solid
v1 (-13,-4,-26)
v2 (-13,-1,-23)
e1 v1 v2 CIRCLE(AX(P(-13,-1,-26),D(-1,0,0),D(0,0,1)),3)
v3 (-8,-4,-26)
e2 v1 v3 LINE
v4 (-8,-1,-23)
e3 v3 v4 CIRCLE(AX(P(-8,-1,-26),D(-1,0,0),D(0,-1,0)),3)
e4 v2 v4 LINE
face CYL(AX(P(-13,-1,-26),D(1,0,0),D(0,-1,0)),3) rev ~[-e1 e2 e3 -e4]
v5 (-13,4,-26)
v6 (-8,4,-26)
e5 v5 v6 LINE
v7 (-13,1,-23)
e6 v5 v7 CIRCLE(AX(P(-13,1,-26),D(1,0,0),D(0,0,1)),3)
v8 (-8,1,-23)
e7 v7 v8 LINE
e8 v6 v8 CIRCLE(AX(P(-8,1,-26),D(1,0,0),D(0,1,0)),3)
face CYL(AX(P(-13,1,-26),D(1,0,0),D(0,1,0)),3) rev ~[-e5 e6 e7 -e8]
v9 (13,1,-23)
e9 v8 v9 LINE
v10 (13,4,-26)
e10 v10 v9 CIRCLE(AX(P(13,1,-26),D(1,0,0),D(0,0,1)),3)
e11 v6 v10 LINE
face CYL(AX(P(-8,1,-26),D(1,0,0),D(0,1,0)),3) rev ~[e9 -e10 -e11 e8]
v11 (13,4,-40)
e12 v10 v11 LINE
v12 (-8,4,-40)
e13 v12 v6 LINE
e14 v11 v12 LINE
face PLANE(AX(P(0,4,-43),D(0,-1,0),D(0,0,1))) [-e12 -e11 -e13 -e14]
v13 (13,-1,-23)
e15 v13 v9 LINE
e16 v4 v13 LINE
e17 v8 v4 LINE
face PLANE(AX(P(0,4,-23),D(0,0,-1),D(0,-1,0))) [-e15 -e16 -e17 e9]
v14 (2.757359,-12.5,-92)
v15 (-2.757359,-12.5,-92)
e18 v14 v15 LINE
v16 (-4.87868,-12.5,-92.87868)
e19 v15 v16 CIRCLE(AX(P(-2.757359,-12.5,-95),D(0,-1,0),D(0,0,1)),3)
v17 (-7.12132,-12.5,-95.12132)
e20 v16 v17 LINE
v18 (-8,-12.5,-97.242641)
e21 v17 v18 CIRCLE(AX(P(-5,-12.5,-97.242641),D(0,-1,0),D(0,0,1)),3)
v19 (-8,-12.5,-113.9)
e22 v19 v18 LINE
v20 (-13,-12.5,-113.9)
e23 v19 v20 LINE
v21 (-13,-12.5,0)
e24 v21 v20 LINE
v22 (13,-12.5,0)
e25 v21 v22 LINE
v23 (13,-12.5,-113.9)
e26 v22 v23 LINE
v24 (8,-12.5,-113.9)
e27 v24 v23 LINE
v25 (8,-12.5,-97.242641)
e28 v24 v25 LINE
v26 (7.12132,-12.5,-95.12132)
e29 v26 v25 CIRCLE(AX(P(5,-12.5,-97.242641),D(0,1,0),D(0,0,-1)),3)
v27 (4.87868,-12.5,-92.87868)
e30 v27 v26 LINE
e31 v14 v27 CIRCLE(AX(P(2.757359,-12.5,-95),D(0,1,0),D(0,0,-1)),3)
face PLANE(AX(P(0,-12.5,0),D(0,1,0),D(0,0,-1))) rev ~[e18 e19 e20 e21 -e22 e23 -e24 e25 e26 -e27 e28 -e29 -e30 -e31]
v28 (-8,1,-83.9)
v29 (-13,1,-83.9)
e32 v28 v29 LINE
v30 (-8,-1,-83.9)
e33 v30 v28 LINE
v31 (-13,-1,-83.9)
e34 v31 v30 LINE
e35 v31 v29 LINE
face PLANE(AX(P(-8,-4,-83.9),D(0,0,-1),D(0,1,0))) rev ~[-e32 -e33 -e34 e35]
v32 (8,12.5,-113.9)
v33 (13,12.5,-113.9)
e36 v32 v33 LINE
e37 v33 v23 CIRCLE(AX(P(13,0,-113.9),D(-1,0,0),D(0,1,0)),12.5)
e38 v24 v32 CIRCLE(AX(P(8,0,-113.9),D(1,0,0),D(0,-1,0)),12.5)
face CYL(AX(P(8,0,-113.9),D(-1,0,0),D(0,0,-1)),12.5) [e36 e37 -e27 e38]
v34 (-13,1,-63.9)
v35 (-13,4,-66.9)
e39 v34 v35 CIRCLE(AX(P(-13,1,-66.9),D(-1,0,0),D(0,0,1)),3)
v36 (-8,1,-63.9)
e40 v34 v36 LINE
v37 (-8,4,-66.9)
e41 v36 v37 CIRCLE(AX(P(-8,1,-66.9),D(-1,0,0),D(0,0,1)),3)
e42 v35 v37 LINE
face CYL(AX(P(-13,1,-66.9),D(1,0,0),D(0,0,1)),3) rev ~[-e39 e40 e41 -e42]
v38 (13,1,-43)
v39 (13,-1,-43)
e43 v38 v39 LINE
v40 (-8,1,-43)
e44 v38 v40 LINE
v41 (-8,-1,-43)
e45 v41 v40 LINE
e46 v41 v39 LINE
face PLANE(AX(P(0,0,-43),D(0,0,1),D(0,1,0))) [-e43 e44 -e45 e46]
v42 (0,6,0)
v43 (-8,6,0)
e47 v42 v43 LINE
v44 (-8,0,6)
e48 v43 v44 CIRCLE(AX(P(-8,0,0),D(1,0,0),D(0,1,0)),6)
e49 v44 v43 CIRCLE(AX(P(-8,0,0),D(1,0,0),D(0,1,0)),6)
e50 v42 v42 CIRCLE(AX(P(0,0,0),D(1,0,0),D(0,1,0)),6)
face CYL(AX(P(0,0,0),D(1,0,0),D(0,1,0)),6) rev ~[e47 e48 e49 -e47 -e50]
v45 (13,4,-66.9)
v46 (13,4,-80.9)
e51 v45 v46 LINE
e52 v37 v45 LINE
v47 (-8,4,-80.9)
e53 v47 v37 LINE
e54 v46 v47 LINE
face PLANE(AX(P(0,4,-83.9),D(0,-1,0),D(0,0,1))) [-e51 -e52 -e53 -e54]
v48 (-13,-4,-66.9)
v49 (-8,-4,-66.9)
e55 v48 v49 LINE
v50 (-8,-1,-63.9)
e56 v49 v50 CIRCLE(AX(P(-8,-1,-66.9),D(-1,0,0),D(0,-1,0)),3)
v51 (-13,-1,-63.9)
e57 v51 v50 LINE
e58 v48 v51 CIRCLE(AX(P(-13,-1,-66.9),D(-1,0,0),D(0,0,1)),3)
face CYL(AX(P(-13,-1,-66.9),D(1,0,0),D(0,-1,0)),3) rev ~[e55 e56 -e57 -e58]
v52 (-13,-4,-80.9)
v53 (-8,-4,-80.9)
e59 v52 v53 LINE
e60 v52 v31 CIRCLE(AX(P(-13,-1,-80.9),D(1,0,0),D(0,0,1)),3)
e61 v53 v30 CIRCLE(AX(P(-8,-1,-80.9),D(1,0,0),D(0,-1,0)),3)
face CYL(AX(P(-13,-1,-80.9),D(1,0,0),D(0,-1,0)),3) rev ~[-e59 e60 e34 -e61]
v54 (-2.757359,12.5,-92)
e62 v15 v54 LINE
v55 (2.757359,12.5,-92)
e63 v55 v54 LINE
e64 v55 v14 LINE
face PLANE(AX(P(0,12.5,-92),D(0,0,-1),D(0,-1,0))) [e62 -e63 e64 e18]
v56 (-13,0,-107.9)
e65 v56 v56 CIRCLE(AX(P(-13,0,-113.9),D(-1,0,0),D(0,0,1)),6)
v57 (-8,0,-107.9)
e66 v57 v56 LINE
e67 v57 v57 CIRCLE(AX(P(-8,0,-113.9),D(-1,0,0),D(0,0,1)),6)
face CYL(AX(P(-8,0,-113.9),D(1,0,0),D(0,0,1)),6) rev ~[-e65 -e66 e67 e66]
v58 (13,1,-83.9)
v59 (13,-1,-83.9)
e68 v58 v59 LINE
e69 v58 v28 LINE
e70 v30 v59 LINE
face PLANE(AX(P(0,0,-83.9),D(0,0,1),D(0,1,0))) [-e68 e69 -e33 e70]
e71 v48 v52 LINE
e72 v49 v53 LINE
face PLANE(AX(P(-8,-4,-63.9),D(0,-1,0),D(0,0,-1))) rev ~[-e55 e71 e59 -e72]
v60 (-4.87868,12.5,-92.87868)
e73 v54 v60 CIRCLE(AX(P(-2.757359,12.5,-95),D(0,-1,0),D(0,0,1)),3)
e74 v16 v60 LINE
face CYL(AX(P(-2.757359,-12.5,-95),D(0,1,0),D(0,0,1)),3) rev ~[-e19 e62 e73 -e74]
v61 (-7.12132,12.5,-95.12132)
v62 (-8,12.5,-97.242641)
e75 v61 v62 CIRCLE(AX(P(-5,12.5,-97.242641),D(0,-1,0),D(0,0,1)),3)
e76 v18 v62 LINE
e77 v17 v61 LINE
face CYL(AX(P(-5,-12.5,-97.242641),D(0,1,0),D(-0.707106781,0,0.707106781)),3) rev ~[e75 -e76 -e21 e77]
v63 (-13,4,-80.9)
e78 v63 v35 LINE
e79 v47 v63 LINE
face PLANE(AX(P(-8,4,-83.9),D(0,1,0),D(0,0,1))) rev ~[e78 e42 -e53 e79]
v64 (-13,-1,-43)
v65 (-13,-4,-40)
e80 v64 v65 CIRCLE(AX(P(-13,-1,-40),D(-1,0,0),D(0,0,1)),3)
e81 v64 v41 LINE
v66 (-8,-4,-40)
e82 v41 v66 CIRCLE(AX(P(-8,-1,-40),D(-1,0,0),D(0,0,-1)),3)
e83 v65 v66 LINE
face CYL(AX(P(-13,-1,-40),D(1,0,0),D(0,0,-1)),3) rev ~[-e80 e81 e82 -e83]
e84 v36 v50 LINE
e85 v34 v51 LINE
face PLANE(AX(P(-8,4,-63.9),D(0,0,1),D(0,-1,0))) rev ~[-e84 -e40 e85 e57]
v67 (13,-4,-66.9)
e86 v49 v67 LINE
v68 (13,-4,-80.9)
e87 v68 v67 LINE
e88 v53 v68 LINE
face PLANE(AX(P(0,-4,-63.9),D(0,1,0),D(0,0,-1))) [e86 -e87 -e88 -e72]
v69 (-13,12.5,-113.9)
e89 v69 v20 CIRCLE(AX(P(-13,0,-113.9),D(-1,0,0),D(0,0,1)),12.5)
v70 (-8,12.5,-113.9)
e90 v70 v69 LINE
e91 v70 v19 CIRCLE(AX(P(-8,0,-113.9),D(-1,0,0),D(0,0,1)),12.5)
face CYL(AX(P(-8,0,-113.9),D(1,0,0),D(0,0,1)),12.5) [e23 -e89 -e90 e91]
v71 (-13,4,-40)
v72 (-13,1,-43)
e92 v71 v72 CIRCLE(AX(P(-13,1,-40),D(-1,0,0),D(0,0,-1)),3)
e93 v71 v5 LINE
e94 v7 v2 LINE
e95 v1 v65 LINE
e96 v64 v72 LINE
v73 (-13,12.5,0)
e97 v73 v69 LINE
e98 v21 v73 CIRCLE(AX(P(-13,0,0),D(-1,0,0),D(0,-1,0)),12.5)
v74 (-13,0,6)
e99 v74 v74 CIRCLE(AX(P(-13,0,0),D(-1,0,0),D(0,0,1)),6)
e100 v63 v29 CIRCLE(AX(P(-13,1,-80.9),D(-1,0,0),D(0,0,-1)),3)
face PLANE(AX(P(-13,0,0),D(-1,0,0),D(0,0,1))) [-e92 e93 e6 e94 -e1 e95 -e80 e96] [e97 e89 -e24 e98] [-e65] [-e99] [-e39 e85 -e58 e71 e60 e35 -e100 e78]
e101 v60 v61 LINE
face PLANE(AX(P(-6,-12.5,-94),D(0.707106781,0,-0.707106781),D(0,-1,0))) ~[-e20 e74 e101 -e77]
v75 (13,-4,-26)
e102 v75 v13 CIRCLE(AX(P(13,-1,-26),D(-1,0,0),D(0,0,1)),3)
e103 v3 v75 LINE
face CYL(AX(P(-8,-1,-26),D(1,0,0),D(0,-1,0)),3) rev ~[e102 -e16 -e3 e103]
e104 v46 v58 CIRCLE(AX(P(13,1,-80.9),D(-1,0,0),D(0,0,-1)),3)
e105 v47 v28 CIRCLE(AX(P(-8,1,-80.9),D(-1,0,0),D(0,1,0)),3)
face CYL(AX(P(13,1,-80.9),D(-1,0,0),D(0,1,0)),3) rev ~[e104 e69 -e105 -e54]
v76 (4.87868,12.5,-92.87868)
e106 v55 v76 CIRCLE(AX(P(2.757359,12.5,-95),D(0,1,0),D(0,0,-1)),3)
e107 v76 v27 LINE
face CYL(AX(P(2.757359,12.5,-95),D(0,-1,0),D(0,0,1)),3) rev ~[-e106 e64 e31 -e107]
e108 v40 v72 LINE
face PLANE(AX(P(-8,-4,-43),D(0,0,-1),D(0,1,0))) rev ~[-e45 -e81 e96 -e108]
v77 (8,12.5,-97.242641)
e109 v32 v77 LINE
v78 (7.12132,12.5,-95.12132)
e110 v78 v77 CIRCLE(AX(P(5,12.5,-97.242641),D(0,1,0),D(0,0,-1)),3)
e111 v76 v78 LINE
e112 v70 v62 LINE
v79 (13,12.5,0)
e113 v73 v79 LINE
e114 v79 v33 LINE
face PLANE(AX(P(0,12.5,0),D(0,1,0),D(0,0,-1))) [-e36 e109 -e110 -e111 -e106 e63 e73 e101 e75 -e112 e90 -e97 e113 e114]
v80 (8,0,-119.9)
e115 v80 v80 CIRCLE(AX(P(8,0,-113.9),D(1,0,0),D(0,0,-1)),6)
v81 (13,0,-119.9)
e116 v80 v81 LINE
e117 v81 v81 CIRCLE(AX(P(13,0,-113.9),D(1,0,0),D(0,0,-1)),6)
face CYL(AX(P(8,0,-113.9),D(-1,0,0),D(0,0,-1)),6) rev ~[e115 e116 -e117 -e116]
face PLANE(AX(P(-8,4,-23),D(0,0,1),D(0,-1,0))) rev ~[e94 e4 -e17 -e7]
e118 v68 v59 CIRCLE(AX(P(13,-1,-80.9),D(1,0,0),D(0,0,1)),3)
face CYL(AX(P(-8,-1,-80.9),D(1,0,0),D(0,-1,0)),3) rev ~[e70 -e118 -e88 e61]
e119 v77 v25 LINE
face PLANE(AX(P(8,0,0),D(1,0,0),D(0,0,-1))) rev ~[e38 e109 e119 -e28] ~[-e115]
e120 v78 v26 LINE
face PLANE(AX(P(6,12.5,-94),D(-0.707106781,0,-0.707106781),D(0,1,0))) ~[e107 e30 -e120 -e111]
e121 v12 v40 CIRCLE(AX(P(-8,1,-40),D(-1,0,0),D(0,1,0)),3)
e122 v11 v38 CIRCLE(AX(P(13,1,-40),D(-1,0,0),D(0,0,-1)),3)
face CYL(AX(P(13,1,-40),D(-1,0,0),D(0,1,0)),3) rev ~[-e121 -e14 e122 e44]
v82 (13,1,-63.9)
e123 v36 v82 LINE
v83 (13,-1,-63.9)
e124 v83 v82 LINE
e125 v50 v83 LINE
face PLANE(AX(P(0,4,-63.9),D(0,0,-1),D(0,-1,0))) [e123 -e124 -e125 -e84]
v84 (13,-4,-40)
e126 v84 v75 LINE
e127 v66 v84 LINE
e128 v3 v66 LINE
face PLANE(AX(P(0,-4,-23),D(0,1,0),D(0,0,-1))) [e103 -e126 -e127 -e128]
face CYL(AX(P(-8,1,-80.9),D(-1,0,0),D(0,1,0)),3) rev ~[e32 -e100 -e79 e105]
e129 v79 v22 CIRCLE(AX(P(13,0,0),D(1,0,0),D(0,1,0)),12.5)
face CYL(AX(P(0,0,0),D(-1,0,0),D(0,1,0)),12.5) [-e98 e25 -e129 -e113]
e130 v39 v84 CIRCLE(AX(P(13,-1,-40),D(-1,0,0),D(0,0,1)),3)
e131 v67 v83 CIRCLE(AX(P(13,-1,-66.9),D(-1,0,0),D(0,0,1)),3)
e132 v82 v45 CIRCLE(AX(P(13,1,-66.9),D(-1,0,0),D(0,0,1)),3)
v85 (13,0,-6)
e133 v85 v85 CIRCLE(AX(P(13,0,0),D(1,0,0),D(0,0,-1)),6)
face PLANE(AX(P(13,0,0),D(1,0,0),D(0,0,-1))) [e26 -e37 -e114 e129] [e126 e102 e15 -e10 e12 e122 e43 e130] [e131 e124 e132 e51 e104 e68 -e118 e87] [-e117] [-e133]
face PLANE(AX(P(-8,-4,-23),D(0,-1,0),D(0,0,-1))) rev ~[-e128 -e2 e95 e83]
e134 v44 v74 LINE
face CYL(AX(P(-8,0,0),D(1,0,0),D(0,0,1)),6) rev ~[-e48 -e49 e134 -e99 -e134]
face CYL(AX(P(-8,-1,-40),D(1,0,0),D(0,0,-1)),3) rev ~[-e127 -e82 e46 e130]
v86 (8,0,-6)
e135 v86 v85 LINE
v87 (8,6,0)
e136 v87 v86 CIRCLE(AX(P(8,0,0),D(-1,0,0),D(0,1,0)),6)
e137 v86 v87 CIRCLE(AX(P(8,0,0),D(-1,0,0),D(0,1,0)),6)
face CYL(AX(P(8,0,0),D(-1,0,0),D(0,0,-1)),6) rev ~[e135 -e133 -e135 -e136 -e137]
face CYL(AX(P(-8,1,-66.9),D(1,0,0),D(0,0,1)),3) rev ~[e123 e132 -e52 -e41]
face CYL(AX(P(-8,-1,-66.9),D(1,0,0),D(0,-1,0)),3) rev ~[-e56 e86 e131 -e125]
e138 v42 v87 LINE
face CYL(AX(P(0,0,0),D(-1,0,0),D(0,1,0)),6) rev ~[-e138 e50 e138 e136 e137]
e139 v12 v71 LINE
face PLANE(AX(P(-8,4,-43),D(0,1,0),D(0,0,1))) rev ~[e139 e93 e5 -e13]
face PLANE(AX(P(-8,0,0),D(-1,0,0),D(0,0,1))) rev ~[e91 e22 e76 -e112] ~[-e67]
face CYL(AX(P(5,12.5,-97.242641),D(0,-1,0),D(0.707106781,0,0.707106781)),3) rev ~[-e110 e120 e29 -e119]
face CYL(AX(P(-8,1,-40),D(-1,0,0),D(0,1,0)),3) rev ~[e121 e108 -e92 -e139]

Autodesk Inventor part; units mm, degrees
ref_plane "YZ Plane" through (0, 0, 0) normal (1, 0, 0) x (0, 1, 0)
ref_plane "XZ Plane" through (0, 0, 0) normal (0, 1, 0) x (-1, 0, 0)
ref_plane "XY Plane" through (0, 0, 0) normal (0, 0, 1) x (1, 0, 0)
sketch "草圖1" plane through (0, 0, 0) normal (1, 0, 0) x (0, 1, 0)
  line L0 (0, 0) -> (0, -113.9)
  circle A0 centre (0, 0) radius 6
  circle A1 centre (0, -113.9) radius 6
  circle A2 centre (0, 0) radius 12.5
  circle A3 centre (0, -113.9) radius 12.5
  line L1 (12.5, 0) -> (12.5, -113.9)
  line L2 (-12.5, 0) -> (-12.5, -113.9)
  line L3 (4, -23) -> (-4, -23)
  line L4 (-4, -23) -> (-4, -43)
  line L5 (-4, -43) -> (4, -43)
  line L6 (4, -43) -> (4, -23)
  line L7 (4, -63.9) -> (-4, -63.9)
  line L8 (-4, -63.9) -> (-4, -83.9)
  line L9 (-4, -83.9) -> (4, -83.9)
  line L10 (4, -83.9) -> (4, -63.9)
  line L11 (12.5, -92) -> (-12.5, -92)
  point P0 (0, -23)
  point P1 (0, -63.9)
  dimension "d0" = 113.9
  dimension "d1" = 12
  dimension "d2" = 25
  dimension "d5" = 20
  dimension "d7" = 8
  dimension "d8" = 23
  dimension "d9" = 30
  dimension "d11" = 92
extrude "擠出1" add sketch "草圖1" along normal mid plane 16 contours A2 L1 L11 L0 L9 L10 L7 L5 L6 L3 | L0 L3 L4 L5 L7 L8 L9 L11 L2 A2 | A2
sketch "草圖4" plane through (8, 0, 0) normal (1, 0, 0) x (0, 0, -1)
  line L0 (63.9, -4) -> (63.9, 4) projected
  line L1 (63.9, 4) -> (83.9, 4) projected
  line L2 (83.9, 4) -> (83.9, -4) projected
  line L3 (83.9, -4) -> (63.9, -4) projected
  line L4 (43, 4) -> (43, -4) projected
  line L5 (43, -4) -> (23, -4) projected
  line L6 (23, -4) -> (23, 4) projected
  line L7 (23, 4) -> (43, 4) projected
  circle A0 centre (0, 0) radius 6 projected
  line L8 (92, 12.5) -> (0, 12.5) projected
  arc A1 (0, 12.5) -> (0, -12.5) centre (0, 0) ccw projected
  line L9 (0, -12.5) -> (92, -12.5) projected
  line L10 (0, 12.5) -> (113.9, 12.5) projected
  line L11 (0, -12.5) -> (113.9, -12.5) projected
  circle A2 centre (113.9, 0) radius 12.5 projected
  circle A3 centre (113.9, 0) radius 6 projected
  point P0 (96, -12.5)
  point P1 (96, 12.5)
extrude "擠出4" add sketch "草圖4" along normal blind 5
sketch "草圖5" plane through (-8, 0, 0) normal (-1, 0, 0) x (0, 0, 1)
  line L0 (-92, -12.5) -> (0, -12.5) projected
  arc A0 (0, -12.5) -> (0, 12.5) centre (0, 0) ccw projected
  line L1 (0, 12.5) -> (-92, 12.5) projected
  circle A1 centre (0, 0) radius 6 projected
  line L2 (-43, -4) -> (-43, 4) projected
  line L3 (-43, 4) -> (-23, 4) projected
  line L4 (-23, 4) -> (-23, -4) projected
  line L5 (-23, -4) -> (-43, -4) projected
  line L6 (-63.9, 4) -> (-63.9, -4) projected
  line L7 (-63.9, -4) -> (-83.9, -4) projected
  line L8 (-83.9, -4) -> (-83.9, 4) projected
  line L9 (-83.9, 4) -> (-63.9, 4) projected
  line L10 (0, -12.5) -> (-113.9, -12.5) projected
  line L11 (0, 12.5) -> (-113.9, 12.5) projected
  circle A2 centre (-113.9, 0) radius 12.5 projected
  circle A3 centre (-113.9, 0) radius 6 projected
extrude "擠出5" add sketch "草圖5" along normal blind 5
chamfer "倒角2" distance 4 angle 45 2 edges at (-8, 0, -92) (8, 0, -92)
fillet "圓角4" radius 3 4 edges at (-8, 0, -96) (-4, 0, -92) (4, 0, -92) (8, 0, -96)
fillet "圓角5" radius 3 8 edges at (0, 4, -23) (0, -4, -23) (0, -4, -43) (0, 4, -43) (0, 4, -63.9) (0, -4, -63.9) (0, -4, -83.9) (0, 4, -83.9)
properties part number "Link_OC" material "ABS 塑膠"
